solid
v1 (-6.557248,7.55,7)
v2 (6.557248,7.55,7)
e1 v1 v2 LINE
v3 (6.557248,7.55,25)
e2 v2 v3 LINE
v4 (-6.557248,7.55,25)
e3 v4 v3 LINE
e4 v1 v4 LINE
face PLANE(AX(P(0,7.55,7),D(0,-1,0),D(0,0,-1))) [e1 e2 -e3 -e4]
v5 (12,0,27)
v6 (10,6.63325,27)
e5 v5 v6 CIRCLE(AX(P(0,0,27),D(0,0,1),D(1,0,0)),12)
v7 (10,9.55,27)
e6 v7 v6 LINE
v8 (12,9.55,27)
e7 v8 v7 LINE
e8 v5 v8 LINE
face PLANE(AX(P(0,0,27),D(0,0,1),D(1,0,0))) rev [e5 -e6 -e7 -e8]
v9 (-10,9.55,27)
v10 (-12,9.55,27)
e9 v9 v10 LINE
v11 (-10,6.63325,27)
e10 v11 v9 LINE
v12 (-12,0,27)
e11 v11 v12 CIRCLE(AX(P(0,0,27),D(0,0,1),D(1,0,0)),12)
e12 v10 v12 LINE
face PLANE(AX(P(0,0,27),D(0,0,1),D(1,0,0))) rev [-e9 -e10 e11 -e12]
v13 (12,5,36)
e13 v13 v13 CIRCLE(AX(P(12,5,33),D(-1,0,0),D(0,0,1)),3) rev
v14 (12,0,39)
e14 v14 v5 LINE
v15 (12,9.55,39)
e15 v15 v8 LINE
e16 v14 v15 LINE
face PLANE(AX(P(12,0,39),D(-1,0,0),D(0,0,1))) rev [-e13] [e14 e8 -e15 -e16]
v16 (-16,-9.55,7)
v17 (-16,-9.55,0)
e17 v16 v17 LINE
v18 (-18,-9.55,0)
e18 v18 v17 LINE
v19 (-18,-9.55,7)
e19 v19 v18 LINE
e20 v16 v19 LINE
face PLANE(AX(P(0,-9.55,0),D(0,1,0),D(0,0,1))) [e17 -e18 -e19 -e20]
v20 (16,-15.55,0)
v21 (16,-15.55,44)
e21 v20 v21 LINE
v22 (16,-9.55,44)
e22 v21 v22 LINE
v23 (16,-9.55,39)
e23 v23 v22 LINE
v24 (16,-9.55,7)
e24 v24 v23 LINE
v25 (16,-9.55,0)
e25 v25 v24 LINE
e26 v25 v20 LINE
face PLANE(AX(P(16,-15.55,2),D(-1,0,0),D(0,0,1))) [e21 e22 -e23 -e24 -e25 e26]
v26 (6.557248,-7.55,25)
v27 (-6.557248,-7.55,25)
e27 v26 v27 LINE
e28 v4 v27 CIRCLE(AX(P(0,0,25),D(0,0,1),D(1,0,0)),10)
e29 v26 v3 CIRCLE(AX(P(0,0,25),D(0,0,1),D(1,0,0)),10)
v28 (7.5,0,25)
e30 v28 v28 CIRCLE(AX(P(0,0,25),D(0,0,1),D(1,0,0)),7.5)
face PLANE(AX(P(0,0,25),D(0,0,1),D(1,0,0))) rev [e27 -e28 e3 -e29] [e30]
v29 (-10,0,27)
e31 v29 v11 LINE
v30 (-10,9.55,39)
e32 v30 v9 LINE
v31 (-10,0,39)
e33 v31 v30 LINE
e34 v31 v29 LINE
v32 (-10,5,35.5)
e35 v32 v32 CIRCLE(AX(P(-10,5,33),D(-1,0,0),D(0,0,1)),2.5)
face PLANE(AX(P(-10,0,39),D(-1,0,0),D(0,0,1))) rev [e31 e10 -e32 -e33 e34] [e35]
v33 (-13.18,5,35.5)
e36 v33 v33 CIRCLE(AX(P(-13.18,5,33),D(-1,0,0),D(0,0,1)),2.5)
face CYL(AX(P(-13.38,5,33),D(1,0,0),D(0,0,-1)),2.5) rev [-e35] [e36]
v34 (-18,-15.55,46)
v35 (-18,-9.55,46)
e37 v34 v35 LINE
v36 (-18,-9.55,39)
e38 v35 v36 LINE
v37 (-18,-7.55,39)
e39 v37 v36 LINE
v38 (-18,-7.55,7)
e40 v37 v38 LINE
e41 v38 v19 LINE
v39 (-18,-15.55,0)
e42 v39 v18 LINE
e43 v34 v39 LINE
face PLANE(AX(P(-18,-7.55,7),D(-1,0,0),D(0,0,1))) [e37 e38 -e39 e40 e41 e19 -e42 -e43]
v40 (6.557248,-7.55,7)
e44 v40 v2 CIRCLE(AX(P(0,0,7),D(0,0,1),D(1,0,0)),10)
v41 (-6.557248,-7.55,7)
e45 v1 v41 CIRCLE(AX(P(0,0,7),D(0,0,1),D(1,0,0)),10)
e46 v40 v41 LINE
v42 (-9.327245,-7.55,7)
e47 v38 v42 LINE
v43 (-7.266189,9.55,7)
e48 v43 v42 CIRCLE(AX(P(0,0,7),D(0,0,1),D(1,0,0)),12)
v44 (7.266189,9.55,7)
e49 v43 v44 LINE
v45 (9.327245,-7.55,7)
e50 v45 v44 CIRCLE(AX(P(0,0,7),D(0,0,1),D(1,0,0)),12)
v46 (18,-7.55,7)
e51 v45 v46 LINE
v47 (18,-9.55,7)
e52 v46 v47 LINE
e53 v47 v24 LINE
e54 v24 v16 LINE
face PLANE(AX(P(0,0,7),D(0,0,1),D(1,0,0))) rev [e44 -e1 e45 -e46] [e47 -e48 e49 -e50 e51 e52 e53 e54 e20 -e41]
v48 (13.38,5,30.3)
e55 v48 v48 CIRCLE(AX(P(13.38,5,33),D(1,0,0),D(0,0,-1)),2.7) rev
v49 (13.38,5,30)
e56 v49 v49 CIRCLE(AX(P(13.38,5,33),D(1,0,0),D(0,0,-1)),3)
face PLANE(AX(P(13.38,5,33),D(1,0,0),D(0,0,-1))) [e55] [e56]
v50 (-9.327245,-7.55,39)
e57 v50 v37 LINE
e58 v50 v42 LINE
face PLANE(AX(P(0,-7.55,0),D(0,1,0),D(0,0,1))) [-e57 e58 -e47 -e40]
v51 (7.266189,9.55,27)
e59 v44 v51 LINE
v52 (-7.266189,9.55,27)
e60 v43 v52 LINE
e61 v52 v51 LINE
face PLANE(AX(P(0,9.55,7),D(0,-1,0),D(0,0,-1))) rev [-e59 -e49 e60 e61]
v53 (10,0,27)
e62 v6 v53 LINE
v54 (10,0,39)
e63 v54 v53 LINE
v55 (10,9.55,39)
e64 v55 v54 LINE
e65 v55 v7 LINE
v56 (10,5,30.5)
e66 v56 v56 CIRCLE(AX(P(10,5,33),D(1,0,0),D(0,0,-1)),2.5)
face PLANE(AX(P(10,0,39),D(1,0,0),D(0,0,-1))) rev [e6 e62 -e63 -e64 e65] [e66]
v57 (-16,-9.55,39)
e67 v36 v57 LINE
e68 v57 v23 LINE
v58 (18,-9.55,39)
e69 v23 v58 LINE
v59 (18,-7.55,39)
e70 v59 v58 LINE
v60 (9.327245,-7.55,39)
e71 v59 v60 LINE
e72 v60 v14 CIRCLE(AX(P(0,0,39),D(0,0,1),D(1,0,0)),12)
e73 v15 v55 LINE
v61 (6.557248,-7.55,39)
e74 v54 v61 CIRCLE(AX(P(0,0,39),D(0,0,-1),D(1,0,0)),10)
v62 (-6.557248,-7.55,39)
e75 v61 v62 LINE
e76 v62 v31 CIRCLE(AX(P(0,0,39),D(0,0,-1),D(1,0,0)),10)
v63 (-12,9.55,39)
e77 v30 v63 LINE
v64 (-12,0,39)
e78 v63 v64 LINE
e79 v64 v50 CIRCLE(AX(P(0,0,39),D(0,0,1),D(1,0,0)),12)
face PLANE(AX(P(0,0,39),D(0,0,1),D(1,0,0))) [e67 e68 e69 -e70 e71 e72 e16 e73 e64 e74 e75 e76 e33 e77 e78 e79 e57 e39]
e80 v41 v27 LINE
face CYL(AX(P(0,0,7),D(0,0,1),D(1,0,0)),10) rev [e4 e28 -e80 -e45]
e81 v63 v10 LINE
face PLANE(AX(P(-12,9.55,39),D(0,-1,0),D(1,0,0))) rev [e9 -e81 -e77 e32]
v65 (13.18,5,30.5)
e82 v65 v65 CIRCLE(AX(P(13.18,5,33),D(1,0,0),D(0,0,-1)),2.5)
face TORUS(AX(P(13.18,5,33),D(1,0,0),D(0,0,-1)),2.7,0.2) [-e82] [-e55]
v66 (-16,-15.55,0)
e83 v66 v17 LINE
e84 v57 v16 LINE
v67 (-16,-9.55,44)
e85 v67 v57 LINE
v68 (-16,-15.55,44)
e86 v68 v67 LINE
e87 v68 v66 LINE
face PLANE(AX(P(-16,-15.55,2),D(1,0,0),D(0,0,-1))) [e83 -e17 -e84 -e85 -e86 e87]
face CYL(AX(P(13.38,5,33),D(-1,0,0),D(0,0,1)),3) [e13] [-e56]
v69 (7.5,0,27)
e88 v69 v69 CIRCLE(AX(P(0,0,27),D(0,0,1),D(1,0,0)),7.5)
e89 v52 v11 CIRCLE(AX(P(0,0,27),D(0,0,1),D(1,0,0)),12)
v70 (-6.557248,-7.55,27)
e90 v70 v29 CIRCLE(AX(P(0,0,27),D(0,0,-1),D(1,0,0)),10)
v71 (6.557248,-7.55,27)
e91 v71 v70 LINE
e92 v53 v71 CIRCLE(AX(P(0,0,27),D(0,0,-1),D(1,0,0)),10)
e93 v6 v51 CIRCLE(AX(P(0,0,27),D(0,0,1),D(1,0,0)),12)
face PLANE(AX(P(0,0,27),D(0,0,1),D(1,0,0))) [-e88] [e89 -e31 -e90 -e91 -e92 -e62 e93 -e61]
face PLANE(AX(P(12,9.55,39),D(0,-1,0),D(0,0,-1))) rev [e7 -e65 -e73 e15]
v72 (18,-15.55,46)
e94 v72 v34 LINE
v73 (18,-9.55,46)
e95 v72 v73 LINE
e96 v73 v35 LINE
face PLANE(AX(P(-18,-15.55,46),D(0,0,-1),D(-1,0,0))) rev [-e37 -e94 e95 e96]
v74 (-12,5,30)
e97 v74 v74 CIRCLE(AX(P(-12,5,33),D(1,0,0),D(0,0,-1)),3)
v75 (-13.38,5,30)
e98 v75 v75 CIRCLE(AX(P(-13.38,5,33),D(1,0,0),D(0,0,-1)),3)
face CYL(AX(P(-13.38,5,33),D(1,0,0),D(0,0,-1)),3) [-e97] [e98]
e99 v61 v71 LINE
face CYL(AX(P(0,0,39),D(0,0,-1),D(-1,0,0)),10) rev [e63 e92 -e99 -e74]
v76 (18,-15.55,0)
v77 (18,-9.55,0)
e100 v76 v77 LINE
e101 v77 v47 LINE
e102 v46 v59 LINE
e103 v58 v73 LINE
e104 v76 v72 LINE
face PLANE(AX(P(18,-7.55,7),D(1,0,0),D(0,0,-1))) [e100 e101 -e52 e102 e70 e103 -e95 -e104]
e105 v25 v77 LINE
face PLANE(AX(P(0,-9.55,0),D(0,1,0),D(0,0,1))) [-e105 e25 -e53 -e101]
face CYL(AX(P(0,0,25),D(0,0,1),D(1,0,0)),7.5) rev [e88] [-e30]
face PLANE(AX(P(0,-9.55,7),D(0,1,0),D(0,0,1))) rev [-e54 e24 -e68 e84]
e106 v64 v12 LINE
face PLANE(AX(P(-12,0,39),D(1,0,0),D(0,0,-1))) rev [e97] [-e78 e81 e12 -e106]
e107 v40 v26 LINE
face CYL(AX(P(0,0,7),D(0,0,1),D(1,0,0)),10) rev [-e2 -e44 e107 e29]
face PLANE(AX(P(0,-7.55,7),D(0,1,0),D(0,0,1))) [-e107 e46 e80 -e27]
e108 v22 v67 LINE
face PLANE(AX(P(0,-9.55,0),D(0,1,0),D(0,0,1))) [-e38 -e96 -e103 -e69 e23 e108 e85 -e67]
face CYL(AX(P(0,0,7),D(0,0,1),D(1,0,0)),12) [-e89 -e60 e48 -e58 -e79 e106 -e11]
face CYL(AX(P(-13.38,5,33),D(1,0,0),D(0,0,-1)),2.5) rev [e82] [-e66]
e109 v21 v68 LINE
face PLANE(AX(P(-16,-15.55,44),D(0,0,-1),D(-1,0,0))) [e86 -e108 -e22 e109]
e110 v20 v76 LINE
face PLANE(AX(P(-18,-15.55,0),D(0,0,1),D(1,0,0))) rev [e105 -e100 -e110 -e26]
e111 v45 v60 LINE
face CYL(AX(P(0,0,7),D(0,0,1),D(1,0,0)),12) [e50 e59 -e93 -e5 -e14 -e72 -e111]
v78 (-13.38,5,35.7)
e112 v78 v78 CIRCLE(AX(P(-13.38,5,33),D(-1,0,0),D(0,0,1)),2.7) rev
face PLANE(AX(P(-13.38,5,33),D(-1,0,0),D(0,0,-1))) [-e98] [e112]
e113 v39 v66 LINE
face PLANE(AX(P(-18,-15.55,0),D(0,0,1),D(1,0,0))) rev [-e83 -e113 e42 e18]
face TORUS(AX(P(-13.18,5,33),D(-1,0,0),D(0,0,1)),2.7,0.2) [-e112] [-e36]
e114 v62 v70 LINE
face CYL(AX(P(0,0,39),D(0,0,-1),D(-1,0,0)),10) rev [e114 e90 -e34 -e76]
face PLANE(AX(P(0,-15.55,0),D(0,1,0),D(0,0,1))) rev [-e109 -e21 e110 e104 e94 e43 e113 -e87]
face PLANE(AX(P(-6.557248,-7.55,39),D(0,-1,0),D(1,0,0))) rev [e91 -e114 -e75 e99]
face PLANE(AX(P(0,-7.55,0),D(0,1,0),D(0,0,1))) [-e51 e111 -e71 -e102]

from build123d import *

# Parameters (mm, degrees)
EXTRUDE1_START     = 7
EXTRUDE1_DEPTH     = 20
SKETCH2_R          = 7.5
CUT_EXTRUDE1_DEPTH = 2
SHELL1_START       = 7
SHELL1_DEPTH       = 18
EXTRUDE2_DEPTH     = 12
SKETCH9_R          = 3
EXTRUDE4_DEPTH     = 1.38
SKETCH10_R         = 2.5
CUT_EXTRUDE3_DEPTH = 49.252462113
FILLET1_R          = 0.2
SKETCH11_W         = 36
SKETCH11_H         = 46
SKETCH11_W_2       = 32
SKETCH11_H_2       = 42
EXTRUDE5_DEPTH     = 6
SKETCH12_W         = 32
SKETCH12_H         = 8.201060756
CUT_EXTRUDE4_DEPTH = 2
SKETCH13_W         = 36
SKETCH13_H         = 32
EXTRUDE6_DEPTH     = 2


# Read off the part's stored shape, not the designer's step: Shell1
with BuildPart() as part:
    # Sketch1 → Extrude1 (new body)
    with BuildSketch(Plane.XY.offset(EXTRUDE1_START)):
        with BuildLine():
            Line((-7.266188822, -9.55), (7.266188822, -9.55))
            ThreePointArc((7.266188822, -9.55), (12, 0), (7.266188822, 9.55))
            Line((7.266188822, 9.55), (-7.266188822, 9.55))
            ThreePointArc((-7.266188822, 9.55), (-12, 0), (-7.266188822, -9.55))
        make_face()
    extrude(amount=EXTRUDE1_DEPTH)

    # Sketch2 → Cut-Extrude1 (cut)
    with BuildSketch(Plane.XY.offset(27)):
        Circle(SKETCH2_R)
    extrude(amount=-CUT_EXTRUDE1_DEPTH, mode=Mode.SUBTRACT)

    # Shell1 outline → Shell1 (cut)
    with BuildSketch(Plane.XY.offset(SHELL1_START)):
        with BuildLine():
            Line((6.557247898, 7.55), (-6.557247898, 7.55))
            ThreePointArc((-6.557247898, 7.55), (-10, 0), (-6.557247898, -7.55))
            Line((-6.557247898, -7.55), (6.557247898, -7.55))
            ThreePointArc((6.557247898, -7.55), (10, 0), (6.557247898, 7.55))
        make_face()
    extrude(amount=SHELL1_DEPTH, mode=Mode.SUBTRACT)

    # Sketch5 → Extrude2 (add)
    with BuildSketch(Plane.XY.offset(27)):
        with BuildLine():
            Line((-7.266188822, -9.55), (7.266188822, -9.55))
            ThreePointArc((7.266188822, -9.55), (10.751610713, -5.329434029), (12, 0))
            Line((12, 0), (12, 9.55))
            Line((12, 9.55), (10, 9.55))
            Line((10, 9.55), (10, 0))
            ThreePointArc((10, 0), (9.098694384, -4.148946916), (6.557247898, -7.55))
            Line((6.557247898, -7.55), (-6.557247898, -7.55))
            ThreePointArc((-6.557247898, -7.55), (-9.098694384, -4.148946916), (-10, 0))
            Line((-10, 0), (-10, 9.55))
            Line((-10, 9.55), (-12, 9.55))
            Line((-12, 9.55), (-12, 0))
            ThreePointArc((-12, 0), (-10.751610713, -5.329434029), (-7.266188822, -9.55))
        make_face()
    extrude(amount=EXTRUDE2_DEPTH)

    # Sketch9 → Extrude4 (add)
    with BuildSketch(Plane(origin=(12, 0, 0), x_dir=(0, 0, -1), z_dir=(1, 0, 0))):
        with Locations(Location((-33, 5, 0), (0, 0, 180))):
            Circle(SKETCH9_R)
    extrude4 = extrude(amount=EXTRUDE4_DEPTH)

    # Mirror2: Extrude4 across plane
    add(extrude4.mirror(Plane(origin=(0, 0, 0), x_dir=(0, 0, 1), z_dir=(1, 0, 0))))

    # Sketch10 → Cut-Extrude3 (cut, through all)
    with BuildSketch(Plane(origin=(13.38, 0, 0), x_dir=(0, 0, -1), z_dir=(1, 0, 0))):
        with Locations((-33, 5)):
            Circle(SKETCH10_R)
    extrude(amount=-CUT_EXTRUDE3_DEPTH, mode=Mode.SUBTRACT)

    # Fillet1
    fillet1_edges = [part.edges().sort_by_distance(p)[0] for p in [
        (-13.38, 5, 35.5),
        (13.38, 5, 35.5),
    ]]
    fillet(fillet1_edges, radius=FILLET1_R)



with BuildPart() as body_2:
    # Sketch11 → Extrude5 (new body)
    with BuildSketch(Plane.XZ.offset(9.55)):
        with Locations((0, 23)):
            Rectangle(SKETCH11_W, SKETCH11_H)
        with Locations((0, 23)):
            Rectangle(SKETCH11_W_2, SKETCH11_H_2, mode=Mode.SUBTRACT)
    extrude(amount=EXTRUDE5_DEPTH)

    # Sketch12 → Cut-Extrude4 (cut)
    with BuildSketch(Plane(origin=(0, 0, 0), x_dir=(-1, 0, 0), z_dir=(0, 0, -1))):
        with Locations((0, -12.325842128)):
            Rectangle(SKETCH12_W, SKETCH12_H)
    extrude(amount=-CUT_EXTRUDE4_DEPTH, mode=Mode.SUBTRACT)


with BuildPart() as part_1:
    add(part.part)

    add(body_2.part)  # Extrude6 merges body 2
    # Sketch13 → Extrude6 (add)
    with BuildSketch(Plane.XZ.offset(9.55)):
        with Locations((0, 23)):
            Rectangle(SKETCH13_W, SKETCH13_H)
    extrude(amount=-EXTRUDE6_DEPTH)


solid = part_1.part
